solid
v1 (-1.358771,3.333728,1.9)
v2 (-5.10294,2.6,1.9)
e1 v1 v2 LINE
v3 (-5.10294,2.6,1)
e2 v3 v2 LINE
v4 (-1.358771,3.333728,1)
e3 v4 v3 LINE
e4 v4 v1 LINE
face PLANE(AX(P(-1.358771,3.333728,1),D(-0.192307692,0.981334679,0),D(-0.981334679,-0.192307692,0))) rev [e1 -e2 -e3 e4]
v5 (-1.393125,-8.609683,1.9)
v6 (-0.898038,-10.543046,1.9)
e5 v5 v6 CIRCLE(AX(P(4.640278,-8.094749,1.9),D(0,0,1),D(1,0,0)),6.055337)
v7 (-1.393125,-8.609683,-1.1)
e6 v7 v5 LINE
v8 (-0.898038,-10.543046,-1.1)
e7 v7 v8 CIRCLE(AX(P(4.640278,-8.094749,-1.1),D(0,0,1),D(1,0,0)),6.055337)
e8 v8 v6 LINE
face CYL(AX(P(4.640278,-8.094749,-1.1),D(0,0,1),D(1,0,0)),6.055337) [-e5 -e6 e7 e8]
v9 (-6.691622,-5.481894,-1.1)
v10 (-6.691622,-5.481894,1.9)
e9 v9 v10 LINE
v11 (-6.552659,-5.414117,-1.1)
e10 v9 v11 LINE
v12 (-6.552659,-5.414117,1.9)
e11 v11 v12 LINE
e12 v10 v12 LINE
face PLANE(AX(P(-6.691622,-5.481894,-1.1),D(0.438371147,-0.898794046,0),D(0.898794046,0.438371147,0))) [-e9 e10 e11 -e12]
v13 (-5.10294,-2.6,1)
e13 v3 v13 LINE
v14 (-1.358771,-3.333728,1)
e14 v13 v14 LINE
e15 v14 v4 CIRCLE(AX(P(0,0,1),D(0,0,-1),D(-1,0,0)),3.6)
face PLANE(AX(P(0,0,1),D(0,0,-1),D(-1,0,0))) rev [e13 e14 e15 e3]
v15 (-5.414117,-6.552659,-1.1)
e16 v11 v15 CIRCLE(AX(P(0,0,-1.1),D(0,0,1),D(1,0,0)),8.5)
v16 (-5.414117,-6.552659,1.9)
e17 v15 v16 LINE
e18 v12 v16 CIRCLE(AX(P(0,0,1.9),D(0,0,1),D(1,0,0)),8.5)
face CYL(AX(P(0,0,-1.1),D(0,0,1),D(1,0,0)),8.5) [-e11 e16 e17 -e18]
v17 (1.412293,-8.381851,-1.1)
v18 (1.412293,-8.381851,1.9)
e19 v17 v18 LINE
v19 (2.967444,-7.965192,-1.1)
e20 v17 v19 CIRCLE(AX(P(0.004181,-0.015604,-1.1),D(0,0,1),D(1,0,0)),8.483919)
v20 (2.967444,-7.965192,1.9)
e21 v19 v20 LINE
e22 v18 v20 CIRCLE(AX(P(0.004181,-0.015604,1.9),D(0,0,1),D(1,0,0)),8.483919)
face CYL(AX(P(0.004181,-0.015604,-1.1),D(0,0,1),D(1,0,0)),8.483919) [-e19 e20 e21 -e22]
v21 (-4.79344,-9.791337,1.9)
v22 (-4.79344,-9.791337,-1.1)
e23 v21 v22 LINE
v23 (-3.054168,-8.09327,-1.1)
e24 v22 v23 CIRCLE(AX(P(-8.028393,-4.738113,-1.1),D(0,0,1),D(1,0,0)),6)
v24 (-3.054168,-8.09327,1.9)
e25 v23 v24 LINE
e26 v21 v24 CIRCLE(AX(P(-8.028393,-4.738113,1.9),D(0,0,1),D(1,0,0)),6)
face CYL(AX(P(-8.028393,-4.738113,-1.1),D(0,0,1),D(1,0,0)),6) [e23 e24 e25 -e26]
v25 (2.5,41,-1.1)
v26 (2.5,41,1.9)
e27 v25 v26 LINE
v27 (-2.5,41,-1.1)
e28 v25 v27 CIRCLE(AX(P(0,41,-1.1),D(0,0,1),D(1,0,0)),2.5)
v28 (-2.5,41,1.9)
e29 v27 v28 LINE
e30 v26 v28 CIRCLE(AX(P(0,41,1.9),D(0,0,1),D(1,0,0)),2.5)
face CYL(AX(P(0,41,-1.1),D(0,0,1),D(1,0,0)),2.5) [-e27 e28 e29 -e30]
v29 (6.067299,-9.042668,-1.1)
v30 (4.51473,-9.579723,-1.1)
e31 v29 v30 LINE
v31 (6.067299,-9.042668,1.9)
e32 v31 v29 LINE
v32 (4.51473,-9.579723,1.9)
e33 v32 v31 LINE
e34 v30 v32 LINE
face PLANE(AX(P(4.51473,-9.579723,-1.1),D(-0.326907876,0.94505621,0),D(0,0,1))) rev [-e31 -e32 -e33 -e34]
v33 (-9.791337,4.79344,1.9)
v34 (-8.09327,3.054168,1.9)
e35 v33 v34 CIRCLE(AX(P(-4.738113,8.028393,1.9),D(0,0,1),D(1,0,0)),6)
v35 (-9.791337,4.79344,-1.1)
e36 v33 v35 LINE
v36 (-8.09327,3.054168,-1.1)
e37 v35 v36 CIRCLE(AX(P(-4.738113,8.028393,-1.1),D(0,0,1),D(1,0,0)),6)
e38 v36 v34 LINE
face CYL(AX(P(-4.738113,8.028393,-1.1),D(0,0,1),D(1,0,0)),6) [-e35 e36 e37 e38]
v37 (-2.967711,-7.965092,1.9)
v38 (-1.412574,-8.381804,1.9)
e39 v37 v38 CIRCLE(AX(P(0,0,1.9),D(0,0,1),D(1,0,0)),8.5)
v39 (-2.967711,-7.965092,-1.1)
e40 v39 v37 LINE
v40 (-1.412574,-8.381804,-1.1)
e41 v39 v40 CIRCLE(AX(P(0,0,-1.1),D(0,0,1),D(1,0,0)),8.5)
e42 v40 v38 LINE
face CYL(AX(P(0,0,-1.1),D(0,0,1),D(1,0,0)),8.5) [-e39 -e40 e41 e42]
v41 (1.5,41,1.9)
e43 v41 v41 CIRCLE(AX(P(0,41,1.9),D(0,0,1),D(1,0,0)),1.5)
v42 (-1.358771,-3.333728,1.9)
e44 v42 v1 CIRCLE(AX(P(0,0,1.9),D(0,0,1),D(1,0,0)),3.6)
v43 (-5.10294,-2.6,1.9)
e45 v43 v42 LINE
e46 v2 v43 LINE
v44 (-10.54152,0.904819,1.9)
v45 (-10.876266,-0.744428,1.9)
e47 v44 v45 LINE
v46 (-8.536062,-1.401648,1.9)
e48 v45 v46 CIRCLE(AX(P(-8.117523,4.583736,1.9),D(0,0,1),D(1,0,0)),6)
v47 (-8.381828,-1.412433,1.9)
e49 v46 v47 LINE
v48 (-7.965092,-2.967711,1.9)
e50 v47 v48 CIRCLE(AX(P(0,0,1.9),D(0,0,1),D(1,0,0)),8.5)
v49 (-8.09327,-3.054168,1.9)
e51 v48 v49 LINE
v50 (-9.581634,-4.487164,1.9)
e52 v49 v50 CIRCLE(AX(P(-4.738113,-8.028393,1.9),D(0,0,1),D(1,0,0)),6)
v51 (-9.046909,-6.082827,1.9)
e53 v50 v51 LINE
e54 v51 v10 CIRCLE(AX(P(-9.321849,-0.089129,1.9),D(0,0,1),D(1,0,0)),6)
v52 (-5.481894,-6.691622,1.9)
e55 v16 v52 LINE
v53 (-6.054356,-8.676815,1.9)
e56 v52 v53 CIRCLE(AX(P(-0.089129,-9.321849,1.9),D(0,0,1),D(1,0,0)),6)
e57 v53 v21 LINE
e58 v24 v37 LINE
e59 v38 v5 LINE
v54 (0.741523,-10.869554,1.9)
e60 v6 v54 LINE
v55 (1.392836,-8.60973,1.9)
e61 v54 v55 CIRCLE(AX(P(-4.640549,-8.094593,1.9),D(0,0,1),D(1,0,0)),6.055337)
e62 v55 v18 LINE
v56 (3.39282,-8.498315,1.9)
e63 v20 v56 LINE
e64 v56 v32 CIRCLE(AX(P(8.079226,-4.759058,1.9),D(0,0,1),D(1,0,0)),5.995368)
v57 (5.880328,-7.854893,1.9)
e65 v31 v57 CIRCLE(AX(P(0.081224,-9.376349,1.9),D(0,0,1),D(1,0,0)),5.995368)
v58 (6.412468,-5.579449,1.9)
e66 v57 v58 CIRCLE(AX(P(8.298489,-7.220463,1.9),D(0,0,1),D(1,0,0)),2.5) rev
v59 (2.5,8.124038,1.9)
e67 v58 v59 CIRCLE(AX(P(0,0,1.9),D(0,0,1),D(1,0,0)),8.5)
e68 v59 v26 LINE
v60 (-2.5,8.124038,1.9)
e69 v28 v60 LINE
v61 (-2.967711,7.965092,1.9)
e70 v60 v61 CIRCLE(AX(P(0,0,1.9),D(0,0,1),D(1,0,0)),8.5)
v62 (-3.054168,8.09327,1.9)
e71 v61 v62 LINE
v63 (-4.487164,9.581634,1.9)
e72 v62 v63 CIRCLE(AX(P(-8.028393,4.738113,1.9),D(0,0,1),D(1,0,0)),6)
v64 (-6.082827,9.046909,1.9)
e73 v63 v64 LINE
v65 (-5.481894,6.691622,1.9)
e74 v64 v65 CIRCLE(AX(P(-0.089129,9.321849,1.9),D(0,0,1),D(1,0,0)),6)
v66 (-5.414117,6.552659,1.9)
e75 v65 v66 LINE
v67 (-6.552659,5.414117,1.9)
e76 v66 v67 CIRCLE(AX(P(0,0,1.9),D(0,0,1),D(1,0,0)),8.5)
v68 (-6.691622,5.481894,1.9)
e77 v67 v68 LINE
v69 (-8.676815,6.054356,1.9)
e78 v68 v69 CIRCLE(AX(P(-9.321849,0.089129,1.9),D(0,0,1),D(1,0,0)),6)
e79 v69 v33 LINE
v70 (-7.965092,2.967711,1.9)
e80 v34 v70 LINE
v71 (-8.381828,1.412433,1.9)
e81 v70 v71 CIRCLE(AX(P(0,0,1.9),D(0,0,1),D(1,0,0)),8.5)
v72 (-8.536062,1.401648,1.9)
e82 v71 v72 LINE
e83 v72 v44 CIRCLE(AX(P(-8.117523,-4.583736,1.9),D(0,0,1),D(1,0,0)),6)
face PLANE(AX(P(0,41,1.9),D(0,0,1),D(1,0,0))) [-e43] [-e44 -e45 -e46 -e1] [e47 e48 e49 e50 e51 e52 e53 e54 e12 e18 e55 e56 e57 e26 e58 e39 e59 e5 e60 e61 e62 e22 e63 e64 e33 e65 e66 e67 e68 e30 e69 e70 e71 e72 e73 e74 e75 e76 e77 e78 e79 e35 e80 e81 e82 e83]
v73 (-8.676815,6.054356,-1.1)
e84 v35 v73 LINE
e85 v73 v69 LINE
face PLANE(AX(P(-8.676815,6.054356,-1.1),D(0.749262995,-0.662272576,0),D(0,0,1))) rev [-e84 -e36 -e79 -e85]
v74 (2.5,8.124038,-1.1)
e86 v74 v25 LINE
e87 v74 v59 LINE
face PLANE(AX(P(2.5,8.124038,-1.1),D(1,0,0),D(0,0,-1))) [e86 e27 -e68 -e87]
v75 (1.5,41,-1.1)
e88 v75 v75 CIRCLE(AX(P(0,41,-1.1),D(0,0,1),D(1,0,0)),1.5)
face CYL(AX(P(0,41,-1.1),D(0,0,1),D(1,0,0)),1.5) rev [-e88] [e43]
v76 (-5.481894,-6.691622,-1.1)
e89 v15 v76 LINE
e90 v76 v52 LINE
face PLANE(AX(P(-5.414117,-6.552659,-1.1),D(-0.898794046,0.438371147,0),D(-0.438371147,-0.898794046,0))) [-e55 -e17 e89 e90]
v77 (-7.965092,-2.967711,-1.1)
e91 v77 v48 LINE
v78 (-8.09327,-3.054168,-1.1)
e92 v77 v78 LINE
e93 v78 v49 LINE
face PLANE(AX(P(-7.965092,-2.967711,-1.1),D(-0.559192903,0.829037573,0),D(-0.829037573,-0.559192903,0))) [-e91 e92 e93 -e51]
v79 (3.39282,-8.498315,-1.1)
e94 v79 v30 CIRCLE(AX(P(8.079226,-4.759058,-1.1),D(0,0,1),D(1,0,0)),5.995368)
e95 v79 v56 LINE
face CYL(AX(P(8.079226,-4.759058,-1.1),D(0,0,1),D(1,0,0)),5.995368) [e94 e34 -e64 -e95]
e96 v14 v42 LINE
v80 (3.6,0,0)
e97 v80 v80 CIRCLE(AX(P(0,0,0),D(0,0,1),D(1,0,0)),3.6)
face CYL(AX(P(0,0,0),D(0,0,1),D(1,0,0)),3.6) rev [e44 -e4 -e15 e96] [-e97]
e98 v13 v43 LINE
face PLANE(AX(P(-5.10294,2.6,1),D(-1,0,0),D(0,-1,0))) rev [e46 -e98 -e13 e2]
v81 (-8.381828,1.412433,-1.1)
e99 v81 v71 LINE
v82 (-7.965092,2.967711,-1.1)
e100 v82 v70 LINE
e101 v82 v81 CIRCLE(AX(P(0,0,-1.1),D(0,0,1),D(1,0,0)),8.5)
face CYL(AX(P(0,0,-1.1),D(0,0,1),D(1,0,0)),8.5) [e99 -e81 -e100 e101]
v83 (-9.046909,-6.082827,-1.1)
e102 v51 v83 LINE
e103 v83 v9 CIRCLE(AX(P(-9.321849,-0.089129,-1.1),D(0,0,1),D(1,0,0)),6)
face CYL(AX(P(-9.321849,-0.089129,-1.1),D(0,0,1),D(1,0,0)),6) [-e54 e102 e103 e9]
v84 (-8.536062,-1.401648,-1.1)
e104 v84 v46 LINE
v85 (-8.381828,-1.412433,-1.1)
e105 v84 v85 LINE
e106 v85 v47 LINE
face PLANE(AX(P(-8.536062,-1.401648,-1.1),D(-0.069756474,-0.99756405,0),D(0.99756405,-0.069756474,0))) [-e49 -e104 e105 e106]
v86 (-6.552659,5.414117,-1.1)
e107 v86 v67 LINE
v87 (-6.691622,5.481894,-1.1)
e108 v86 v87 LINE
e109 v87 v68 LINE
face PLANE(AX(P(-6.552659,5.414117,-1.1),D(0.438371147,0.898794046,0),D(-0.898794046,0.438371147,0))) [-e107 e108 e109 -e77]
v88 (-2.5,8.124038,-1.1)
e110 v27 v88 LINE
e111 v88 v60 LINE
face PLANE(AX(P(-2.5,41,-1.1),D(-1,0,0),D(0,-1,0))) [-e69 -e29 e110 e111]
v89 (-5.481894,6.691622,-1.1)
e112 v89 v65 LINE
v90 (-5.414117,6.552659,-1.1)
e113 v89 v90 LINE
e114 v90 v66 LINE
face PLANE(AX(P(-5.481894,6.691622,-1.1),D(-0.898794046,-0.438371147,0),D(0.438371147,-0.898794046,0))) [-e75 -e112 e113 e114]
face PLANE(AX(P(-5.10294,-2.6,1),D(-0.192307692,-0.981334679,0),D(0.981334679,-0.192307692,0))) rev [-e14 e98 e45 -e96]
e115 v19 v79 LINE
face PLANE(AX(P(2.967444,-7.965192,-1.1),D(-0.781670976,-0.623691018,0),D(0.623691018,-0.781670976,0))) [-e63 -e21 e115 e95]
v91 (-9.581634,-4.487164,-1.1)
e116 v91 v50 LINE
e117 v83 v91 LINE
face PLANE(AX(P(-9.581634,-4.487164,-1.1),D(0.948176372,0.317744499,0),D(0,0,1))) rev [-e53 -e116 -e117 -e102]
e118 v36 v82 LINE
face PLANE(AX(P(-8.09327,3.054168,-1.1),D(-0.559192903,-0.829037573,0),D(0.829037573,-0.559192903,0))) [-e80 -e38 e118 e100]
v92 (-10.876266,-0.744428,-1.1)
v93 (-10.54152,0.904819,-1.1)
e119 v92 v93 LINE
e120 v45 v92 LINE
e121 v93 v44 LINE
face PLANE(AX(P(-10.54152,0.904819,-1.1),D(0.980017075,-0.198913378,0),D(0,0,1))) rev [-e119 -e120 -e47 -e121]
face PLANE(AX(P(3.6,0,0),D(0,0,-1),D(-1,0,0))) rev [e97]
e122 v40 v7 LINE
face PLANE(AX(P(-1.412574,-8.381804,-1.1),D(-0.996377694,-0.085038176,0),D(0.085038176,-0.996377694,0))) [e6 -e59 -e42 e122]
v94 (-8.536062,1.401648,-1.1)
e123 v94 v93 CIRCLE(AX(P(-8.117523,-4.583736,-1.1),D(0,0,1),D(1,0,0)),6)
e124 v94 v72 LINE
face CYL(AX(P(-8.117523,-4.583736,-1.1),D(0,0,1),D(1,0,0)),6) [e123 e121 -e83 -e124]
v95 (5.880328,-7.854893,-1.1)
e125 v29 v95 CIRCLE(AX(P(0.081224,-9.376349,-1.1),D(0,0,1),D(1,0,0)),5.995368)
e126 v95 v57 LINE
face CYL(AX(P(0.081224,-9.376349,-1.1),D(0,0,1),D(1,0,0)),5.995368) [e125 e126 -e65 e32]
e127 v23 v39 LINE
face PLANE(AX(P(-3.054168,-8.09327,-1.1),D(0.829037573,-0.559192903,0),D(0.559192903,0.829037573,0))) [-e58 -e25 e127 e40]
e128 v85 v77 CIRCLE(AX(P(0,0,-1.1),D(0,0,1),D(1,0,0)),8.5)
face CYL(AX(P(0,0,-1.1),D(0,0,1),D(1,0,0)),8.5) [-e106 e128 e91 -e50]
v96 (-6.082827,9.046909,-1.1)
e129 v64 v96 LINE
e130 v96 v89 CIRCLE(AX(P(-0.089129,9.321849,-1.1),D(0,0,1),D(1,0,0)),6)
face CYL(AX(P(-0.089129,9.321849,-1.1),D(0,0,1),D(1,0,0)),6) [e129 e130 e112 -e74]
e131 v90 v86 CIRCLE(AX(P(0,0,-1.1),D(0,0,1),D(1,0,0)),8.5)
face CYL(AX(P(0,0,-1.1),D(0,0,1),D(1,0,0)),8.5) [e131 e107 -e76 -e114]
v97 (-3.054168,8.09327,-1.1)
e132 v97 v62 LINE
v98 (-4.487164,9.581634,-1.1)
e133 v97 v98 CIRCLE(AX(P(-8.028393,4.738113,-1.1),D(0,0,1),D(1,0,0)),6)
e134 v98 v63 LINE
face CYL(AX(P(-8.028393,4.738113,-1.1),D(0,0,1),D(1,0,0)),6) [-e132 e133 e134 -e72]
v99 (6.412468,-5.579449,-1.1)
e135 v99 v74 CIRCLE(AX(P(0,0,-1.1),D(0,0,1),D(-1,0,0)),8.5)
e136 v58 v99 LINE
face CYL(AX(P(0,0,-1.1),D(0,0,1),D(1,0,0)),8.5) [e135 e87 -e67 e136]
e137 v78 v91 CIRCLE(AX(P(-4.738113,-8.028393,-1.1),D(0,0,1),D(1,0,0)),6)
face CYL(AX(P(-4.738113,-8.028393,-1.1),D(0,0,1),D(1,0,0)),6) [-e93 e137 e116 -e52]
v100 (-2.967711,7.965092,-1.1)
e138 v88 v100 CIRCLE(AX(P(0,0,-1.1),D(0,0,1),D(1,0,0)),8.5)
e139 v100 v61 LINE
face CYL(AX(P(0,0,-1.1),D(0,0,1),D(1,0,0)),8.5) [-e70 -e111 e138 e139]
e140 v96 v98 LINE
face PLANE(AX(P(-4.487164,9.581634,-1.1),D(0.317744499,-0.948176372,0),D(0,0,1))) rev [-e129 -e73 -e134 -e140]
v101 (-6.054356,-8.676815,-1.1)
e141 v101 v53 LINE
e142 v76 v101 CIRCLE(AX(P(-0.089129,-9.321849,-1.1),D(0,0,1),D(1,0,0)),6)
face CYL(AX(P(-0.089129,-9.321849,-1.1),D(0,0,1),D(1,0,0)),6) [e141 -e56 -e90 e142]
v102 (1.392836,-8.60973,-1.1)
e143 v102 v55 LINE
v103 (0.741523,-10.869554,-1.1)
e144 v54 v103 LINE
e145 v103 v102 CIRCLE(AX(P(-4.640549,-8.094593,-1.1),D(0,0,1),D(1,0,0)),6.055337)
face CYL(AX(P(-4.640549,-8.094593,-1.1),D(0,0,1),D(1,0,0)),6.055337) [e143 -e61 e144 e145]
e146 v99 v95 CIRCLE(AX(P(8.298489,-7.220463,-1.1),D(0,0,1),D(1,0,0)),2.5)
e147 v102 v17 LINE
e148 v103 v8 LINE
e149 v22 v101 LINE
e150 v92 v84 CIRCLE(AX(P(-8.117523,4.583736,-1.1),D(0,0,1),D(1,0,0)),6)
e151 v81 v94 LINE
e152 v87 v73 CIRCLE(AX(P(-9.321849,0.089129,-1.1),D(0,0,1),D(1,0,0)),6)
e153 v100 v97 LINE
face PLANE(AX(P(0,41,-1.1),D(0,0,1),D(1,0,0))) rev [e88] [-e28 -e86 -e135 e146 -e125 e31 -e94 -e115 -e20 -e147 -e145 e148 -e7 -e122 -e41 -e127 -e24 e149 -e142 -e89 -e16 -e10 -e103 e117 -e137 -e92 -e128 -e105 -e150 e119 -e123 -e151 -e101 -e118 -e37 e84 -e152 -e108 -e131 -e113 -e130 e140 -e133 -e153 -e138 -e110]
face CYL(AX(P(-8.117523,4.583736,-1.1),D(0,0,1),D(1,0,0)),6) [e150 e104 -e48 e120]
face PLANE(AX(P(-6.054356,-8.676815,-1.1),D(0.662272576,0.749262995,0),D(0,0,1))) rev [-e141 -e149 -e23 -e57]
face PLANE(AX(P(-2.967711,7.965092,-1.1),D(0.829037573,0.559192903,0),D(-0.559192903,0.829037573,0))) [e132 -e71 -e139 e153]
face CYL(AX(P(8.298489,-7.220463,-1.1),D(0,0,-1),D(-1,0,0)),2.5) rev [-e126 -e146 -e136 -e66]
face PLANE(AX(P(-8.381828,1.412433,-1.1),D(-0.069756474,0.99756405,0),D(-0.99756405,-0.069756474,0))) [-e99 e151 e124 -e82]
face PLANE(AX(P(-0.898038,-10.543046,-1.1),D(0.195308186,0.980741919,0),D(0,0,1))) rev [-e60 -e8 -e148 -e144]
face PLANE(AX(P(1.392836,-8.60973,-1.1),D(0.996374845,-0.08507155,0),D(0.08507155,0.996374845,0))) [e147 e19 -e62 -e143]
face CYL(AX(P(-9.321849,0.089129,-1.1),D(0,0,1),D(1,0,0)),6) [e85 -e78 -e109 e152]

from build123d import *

# Parameters (mm, degrees)
SKETCH1_R           = 1.5
BOSS_EXTRUDE1_DEPTH = 3
CUT_EXTRUDE2_DEPTH  = 0.9
SKETCH5_W           = 3.6
SKETCH5_H           = 3
FILLET1_R           = 2.5


with BuildPart() as part:
    # Sketch1 → Boss-Extrude1 (new body)
    with BuildSketch(Plane.XY.offset(1.9)):
        with BuildLine():
            Line((2.5, 8.124038405), (2.5, 41))
            ThreePointArc((2.5, 41), (0, 43.5), (-2.5, 41))
            Line((-2.5, 41), (-2.5, 8.124038405))
            ThreePointArc((-2.5, 8.124038405), (-2.735010245, 8.047963653), (-2.967710696, 7.965092167))
            Line((-2.967710696, 7.965092167), (-3.054167872, 8.093270203))
            ThreePointArc((-3.054167872, 8.093270203), (-4.342095244, 9.472160372), (-5.994566265, 10.382893341))
            ThreePointArc((-5.994566265, 10.382893341), (-6.032083889, 8.496444973), (-5.481893659, 6.691622066))
            Line((-5.481893659, 6.691622066), (-5.414116812, 6.552658937))
            ThreePointArc((-5.414116812, 6.552658937), (-6.01040764, 6.01040764), (-6.552658937, 5.414116812))
            Line((-6.552658937, 5.414116812), (-6.691622066, 5.481893659))
            ThreePointArc((-6.691622066, 5.481893659), (-8.496444973, 6.032083889), (-10.382893341, 5.994566265))
            ThreePointArc((-10.382893341, 5.994566265), (-9.472160372, 4.342095244), (-8.093270203, 3.054167872))
            Line((-8.093270203, 3.054167872), (-7.965092167, 2.967710696))
            ThreePointArc((-7.965092167, 2.967710696), (-8.210369523, 2.199961883), (-8.381827508, 1.41243323))
            Line((-8.381827508, 1.41243323), (-8.536061531, 1.401648136))
            ThreePointArc((-8.536061531, 1.401648136), (-10.374179133, 0.975715399), (-11.989132531, 0))
            ThreePointArc((-11.989132531, 0), (-10.374179133, -0.975715399), (-8.536061531, -1.401648136))
            Line((-8.536061531, -1.401648136), (-8.381827508, -1.41243323))
            ThreePointArc((-8.381827508, -1.41243323), (-8.210369523, -2.199961883), (-7.965092167, -2.967710696))
            Line((-7.965092167, -2.967710696), (-8.093270203, -3.054167872))
            ThreePointArc((-8.093270203, -3.054167872), (-9.472160372, -4.342095244), (-10.382893341, -5.994566265))
            ThreePointArc((-10.382893341, -5.994566265), (-8.496444973, -6.032083889), (-6.691622066, -5.481893659))
            Line((-6.691622066, -5.481893659), (-6.552658937, -5.414116812))
            ThreePointArc((-6.552658937, -5.414116812), (-6.01040764, -6.01040764), (-5.414116812, -6.552658937))
            Line((-5.414116812, -6.552658937), (-5.481893659, -6.691622066))
            ThreePointArc((-5.481893659, -6.691622066), (-6.032083889, -8.496444973), (-5.994566265, -10.382893341))
            ThreePointArc((-5.994566265, -10.382893341), (-4.342095244, -9.472160372), (-3.054167872, -8.093270203))
            Line((-3.054167872, -8.093270203), (-2.967710696, -7.965092167))
            ThreePointArc((-2.967710696, -7.965092167), (-2.200030635, -8.210351101), (-1.412573605, -8.381803852))
            Line((-1.412573605, -8.381803852), (-1.393124693, -8.60968341))
            ThreePointArc((-1.393124693, -8.60968341), (-0.957124189, -10.404769076), (-0.000200717, -11.984872381))
            ThreePointArc((-0.000200717, -11.984872381), (0.95677568, -10.404801129), (1.39283631, -8.609730068))
            Line((1.39283631, -8.609730068), (1.412292855, -8.381851161))
            ThreePointArc((1.412292855, -8.381851161), (2.199774454, -8.210495053), (2.967443903, -7.965191566))
            Line((2.967443903, -7.965191566), (3.392820223, -8.498315042))
            ThreePointArc((3.392820223, -8.498315042), (4.564279824, -9.615969997), (5.992088536, -10.379404655))
            ThreePointArc((5.992088536, -10.379404655), (6.04494749, -8.761172247), (5.662865105, -7.187805396))
            Line((5.662865105, -7.187805396), (5.413897328, -6.552840279))
            ThreePointArc((5.413897328, -6.552840279), (7.689867596, -3.621593069), (8.5, 0))
            ThreePointArc((8.5, 0), (6.837397166, 5.049752469), (2.5, 8.124038405))
        make_face()
        with Locations((0, 41)):
            Circle(SKETCH1_R, mode=Mode.SUBTRACT)
    extrude(amount=-BOSS_EXTRUDE1_DEPTH)

    # Sketch4 → Cut-Extrude2 (cut)
    with BuildSketch(Plane.XY.offset(1.9)):
        with BuildLine():
            Line((-5.102940329, -2.6), (-1.358771093, -3.333727811))
            ThreePointArc((-1.358771093, -3.333727811), (-3.6, 0), (-1.358771093, 3.333727811))
            Line((-1.358771093, 3.333727811), (-5.102940329, 2.6))
            Line((-5.102940329, 2.6), (-5.102940329, -2.6))
        make_face()
    extrude(amount=-CUT_EXTRUDE2_DEPTH, mode=Mode.SUBTRACT)

    # Sketch5 → Cut-Revolve1 (revolve, cut)
    with BuildSketch(Plane(origin=(0, 0, 0), x_dir=(1, 0, 0), z_dir=(0, 1, 0))):
        with Locations((1.8, -1.5)):
            Rectangle(SKETCH5_W, SKETCH5_H)
    revolve(axis=Axis((0, 0, 0), (0, 0, 1)), mode=Mode.SUBTRACT)

    # Chamfer1
    # the kernel refuses this chamfer: 1.996823512, 1.978396736, 1.94931332, 1.412365401 mm, written as the material it takes off along each edge
    with BuildSketch(Plane(origin=(5.992088536, -10.379404655, 6.233820359), x_dir=(-0.8794300447910056, 0.4760281465616188, 0), z_dir=(0, 0, -1))) as chamfer1_piece_1:
        with BuildLine():
            Line((1.679904515, 0), (0.570181749, 1.211368913))
            ThreePointArc((0.570181749, 1.211368913), (0.257488937, 0.635031779), (0, 0))
            ThreePointArc((0, 0), (0.866421107, -0.059071898), (1.679904515, 0))
        make_face()
    extrude(amount=11.667640718, mode=Mode.SUBTRACT)
    with BuildSketch(Plane(origin=(-0.000200717, -11.984872381, 6.284042251), x_dir=(0.553758056262258, 0.8326776177637093, 0), z_dir=(0, 0, -1))) as chamfer1_piece_2:
        with BuildLine():
            Line((1.33943628, 0), (0.703391742, -1.546031937))
            ThreePointArc((0.703391742, -1.546031937), (0.308543545, -0.822544611), (0, 0))
            ThreePointArc((0, 0), (0.684773692, 0.037130534), (1.33943628, 0))
        make_face()
    extrude(amount=11.768084503, mode=Mode.SUBTRACT)
    with BuildSketch(Plane(origin=(-5.994566265, -10.382893341, 6.307600342), x_dir=(0.8971018613244867, 0.44182377754953556, 0), z_dir=(0, 0, -1)), Plane(origin=(-10.382893341, -5.994566265, 6.307600342), x_dir=(0.9978248904640774, -0.06592031530834563, 0), z_dir=(0, 0, -1)), Plane(origin=(-11.989132531, 0, 6.307600342), x_dir=(0.8311815460161414, -0.5560011129145489, 0), z_dir=(0, 0, -1))) as chamfer1_piece_3:
        with BuildLine():
            Line((1.33889649, 0), (0.700148491, -1.556942978))
            ThreePointArc((0.700148491, -1.556942978), (0.305807457, -0.828670891), (0, 0))
            ThreePointArc((0, 0), (0.684607685, 0.037444556), (1.33889649, 0))
        make_face()
    extrude(amount=11.815200684, mode=Mode.SUBTRACT)
    with BuildSketch(Plane(origin=(-10.382893341, 5.994566265, 6.307600342), x_dir=(0.9993864811320993, 0.035023725250178994, 0), z_dir=(0, 0, -1)), Plane(origin=(-5.994566265, 10.382893341, 6.307600342), x_dir=(0.8830059434842266, -0.4693618047642254, 0), z_dir=(0, 0, -1))) as chamfer1_piece_4:
        with BuildLine():
            Line((1.707126049, 0), (0.549125448, 1.221108125))
            ThreePointArc((0.549125448, 1.221108125), (0.246629708, 0.639737105), (0, 0))
            ThreePointArc((0, 0), (0.881190909, -0.060960877), (1.707126049, 0))
        make_face()
    extrude(amount=11.815200684, mode=Mode.SUBTRACT)

    # Fillet1
    fillet1_edges = [part.edges().sort_by_distance(p)[0] for p in [
        (5.413897328, -6.552840279, 0.4),
    ]]
    fillet(fillet1_edges, radius=FILLET1_R)


solid = part.part
